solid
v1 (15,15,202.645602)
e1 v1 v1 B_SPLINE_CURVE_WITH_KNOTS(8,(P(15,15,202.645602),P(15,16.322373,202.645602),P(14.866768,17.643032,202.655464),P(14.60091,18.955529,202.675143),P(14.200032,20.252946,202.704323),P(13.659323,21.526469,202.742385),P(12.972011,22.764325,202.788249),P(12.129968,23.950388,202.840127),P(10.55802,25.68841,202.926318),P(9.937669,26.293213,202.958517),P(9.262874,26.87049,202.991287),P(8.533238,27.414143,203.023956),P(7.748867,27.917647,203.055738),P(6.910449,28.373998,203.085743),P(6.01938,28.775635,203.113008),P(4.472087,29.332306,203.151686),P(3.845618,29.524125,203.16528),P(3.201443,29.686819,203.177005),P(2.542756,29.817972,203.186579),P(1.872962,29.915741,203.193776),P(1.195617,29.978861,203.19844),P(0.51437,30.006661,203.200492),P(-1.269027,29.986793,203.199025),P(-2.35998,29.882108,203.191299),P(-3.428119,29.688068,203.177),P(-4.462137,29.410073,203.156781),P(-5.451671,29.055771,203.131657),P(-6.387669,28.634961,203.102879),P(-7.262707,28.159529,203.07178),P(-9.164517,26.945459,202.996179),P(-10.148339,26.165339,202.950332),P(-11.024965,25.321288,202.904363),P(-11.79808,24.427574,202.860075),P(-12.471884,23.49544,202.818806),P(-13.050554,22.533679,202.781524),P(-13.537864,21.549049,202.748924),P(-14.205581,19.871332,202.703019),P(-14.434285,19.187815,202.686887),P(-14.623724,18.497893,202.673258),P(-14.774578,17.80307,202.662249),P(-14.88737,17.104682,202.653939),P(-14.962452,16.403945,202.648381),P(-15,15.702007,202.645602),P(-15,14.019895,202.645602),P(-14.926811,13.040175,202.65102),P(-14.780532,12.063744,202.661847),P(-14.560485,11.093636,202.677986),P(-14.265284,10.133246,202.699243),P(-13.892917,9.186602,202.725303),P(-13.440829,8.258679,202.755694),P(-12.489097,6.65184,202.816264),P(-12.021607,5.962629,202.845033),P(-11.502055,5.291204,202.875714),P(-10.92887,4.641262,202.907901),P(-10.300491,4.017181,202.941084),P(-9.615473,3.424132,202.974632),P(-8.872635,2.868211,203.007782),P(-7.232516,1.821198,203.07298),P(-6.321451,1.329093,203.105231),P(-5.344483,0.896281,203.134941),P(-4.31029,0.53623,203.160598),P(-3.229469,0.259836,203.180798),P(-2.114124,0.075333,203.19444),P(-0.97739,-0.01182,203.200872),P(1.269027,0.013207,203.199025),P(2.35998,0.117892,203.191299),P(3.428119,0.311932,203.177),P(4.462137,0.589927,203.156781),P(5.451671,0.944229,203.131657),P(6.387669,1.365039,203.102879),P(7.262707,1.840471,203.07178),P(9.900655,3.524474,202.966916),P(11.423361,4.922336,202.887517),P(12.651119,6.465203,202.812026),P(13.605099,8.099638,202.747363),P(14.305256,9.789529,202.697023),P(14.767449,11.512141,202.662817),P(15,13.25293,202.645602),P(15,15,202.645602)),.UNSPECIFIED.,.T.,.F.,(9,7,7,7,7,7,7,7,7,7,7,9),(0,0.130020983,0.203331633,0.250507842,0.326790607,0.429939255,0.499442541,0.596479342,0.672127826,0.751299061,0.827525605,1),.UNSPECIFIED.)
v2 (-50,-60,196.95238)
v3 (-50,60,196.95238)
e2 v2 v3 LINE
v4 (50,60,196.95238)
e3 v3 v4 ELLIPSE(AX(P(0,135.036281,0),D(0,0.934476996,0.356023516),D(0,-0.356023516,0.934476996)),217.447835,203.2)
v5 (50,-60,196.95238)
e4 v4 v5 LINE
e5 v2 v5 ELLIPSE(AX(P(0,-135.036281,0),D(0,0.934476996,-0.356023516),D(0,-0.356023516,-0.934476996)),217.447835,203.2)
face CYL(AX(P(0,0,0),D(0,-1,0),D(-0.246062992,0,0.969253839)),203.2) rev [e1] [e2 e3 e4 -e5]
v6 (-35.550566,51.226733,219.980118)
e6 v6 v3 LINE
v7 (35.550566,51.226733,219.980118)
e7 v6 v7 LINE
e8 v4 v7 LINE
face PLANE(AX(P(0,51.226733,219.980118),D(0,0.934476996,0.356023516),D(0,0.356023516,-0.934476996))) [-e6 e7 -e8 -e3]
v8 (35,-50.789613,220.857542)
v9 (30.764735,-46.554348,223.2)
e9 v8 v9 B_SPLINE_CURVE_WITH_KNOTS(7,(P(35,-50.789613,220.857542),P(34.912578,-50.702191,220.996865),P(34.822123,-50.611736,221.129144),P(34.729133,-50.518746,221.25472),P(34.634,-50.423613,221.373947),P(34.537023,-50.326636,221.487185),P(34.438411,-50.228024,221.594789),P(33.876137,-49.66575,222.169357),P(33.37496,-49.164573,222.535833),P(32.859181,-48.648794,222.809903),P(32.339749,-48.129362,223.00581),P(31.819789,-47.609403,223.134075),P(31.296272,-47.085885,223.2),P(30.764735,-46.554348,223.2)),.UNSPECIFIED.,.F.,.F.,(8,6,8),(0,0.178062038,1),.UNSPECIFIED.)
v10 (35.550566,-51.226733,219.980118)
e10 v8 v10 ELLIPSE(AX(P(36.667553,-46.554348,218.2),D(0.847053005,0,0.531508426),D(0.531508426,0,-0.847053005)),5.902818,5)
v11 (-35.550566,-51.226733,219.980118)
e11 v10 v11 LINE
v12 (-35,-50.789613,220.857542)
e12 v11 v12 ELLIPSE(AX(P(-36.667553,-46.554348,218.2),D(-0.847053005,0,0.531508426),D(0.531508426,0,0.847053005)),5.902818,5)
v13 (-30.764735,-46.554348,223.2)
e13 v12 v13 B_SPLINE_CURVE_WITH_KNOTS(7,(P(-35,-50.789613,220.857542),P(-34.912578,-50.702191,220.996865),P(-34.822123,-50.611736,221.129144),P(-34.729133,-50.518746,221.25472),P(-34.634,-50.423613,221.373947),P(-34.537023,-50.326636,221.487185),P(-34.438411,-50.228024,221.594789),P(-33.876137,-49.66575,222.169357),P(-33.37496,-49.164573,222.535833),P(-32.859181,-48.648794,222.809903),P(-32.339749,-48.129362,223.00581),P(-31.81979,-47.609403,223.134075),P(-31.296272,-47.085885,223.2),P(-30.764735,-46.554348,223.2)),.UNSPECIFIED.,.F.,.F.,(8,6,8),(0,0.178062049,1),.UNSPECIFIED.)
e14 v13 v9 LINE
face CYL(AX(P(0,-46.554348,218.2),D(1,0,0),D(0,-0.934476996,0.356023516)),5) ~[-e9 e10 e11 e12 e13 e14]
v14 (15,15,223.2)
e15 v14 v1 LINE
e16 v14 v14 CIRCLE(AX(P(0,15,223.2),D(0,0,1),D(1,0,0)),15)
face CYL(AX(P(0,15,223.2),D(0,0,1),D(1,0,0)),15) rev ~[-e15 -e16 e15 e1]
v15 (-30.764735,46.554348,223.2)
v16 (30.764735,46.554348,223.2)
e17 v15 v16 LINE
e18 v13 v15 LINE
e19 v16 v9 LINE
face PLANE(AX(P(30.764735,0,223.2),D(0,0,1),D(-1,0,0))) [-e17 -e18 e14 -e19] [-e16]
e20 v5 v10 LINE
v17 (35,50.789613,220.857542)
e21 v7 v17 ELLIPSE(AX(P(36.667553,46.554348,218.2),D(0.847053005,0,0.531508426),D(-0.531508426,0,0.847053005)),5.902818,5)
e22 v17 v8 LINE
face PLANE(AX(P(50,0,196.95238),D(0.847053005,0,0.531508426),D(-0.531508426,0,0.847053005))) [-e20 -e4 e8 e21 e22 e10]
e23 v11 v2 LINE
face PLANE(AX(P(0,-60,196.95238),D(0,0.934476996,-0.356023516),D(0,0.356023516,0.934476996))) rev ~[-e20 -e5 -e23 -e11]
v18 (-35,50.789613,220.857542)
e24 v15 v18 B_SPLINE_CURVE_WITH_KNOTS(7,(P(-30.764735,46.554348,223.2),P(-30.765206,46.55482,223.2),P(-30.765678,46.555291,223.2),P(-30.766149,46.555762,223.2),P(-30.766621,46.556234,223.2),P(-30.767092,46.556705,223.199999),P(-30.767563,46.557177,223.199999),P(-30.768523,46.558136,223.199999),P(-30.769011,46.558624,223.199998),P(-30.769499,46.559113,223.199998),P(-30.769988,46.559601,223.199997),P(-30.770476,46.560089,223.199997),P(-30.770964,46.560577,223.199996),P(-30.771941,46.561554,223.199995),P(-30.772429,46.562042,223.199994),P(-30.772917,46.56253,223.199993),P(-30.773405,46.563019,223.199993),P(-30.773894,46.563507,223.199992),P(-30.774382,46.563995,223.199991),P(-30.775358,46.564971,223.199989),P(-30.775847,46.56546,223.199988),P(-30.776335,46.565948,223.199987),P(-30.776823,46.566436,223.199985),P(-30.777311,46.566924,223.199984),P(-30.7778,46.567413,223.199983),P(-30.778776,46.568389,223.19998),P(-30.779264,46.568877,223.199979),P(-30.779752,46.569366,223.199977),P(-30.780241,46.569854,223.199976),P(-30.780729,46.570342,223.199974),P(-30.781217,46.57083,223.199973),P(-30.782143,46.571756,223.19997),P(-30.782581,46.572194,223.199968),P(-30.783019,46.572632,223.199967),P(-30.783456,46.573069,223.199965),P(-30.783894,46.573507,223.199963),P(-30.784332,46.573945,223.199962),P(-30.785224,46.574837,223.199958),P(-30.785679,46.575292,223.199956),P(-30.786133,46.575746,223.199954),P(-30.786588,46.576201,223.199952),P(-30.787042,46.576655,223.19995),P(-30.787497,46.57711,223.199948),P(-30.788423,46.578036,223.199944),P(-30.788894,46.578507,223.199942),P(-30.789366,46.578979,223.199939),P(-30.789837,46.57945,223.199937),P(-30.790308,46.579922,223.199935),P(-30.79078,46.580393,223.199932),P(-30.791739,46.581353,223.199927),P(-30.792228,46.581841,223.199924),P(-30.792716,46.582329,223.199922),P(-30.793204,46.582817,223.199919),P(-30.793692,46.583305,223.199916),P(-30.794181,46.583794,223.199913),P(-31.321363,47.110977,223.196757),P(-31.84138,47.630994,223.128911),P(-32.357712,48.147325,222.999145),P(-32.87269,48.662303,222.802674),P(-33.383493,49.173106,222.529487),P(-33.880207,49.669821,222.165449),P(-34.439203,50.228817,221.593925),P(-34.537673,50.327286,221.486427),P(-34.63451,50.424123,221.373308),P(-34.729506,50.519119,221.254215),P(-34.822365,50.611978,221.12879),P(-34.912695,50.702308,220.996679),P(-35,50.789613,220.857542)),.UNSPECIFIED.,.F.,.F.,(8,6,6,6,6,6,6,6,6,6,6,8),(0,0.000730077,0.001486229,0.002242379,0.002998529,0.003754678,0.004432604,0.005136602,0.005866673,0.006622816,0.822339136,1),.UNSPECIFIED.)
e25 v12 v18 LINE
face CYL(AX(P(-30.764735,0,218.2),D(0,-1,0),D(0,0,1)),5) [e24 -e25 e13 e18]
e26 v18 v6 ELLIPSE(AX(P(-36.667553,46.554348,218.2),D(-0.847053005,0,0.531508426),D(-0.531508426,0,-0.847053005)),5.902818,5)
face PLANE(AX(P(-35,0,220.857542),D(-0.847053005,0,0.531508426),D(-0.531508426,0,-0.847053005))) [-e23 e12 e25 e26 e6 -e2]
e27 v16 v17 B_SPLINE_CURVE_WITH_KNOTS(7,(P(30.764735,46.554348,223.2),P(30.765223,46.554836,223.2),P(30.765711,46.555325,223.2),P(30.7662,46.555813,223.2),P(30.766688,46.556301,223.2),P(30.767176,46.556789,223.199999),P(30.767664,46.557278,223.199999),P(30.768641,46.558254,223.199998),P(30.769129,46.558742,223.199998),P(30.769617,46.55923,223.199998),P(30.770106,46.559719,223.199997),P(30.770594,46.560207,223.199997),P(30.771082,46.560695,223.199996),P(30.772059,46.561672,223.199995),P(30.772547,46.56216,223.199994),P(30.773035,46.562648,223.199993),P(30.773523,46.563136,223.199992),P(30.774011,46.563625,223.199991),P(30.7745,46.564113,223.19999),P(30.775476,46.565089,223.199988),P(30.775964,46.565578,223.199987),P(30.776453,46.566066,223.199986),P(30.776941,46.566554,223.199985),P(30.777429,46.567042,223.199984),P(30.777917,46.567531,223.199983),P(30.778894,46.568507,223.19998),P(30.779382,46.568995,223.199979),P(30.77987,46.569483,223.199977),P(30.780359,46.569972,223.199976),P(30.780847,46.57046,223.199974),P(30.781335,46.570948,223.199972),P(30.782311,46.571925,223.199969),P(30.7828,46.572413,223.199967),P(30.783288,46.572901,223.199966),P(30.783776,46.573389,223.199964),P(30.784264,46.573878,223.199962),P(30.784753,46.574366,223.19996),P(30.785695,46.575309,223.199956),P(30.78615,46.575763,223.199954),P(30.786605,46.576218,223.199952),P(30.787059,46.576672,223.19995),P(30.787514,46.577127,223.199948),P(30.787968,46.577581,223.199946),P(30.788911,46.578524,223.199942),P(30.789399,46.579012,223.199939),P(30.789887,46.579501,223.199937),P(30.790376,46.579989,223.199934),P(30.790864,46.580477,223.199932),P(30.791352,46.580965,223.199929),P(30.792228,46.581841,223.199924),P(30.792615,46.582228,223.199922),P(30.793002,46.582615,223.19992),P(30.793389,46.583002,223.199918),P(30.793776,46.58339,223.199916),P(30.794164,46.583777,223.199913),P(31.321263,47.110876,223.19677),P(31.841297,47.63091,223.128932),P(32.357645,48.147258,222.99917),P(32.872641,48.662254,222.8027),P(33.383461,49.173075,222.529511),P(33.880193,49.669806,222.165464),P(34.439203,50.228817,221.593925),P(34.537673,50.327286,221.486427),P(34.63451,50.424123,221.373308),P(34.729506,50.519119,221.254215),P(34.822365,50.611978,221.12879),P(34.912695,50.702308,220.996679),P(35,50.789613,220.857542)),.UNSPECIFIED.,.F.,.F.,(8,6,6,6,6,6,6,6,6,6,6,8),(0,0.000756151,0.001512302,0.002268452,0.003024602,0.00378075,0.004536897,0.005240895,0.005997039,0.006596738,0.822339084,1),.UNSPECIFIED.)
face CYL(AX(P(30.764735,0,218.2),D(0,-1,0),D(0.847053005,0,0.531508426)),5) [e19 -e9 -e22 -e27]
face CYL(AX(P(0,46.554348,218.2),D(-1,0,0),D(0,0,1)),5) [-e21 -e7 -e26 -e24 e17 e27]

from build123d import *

# Parameters (mm, degrees)
F1_DEPTH = 60
F3_DEPTH = 75
F4_R     = 15
F5_DEPTH = 25


# Not quite as in the source:
# - a feature names something its author has since deleted; it is built from what else it names


with BuildPart() as f1:
    # F0 (on Front) → F1 (new body, symmetric)
    with BuildSketch(Plane.XZ):
        with BuildLine():
            ThreePointArc((-50, 196.9523800313), (0, 203.2), (50, 196.9523800313))
            Line((50, 196.9523800313), (35, 220.857542129))
            ThreePointArc((35, 220.857542129), (33.1846822218, 222.5753691641), (30.7647349749, 223.2))
            Line((30.7647349749, 223.2), (-30.7647349749, 223.2))
            ThreePointArc((-30.7647349749, 223.2), (-33.1846822218, 222.5753691641), (-35, 220.857542129))
            Line((-35, 220.857542129), (-50, 196.9523800313))
        make_face()
    extrude(amount=F1_DEPTH, both=True)

    # F2 (on Right) → F3 (cut, symmetric)
    with BuildSketch(Plane.YZ):
        with BuildLine():
            Line((60, 223.2), (46.5543481195, 223.2))
            ThreePointArc((46.5543481195, 223.2), (49.3915485081, 222.3170734697), (51.2267330988, 219.980117582))
            Line((51.2267330988, 219.980117582), (60, 196.9523800313))
            Line((60, 196.9523800313), (60, 223.2))
        make_face()
        with BuildLine():
            ThreePointArc((-51.2267330988, 219.980117582), (-49.3915485081, 222.3170734697), (-46.5543481195, 223.2))
            Line((-46.5543481195, 223.2), (-60, 223.2))
            Line((-60, 223.2), (-60, 196.9523800313))
            Line((-60, 196.9523800313), (-51.2267330988, 219.980117582))
        make_face()
    extrude(amount=F3_DEPTH, both=True, mode=Mode.SUBTRACT)

    # F4 (on face) → F5 (cut)
    with BuildSketch(Plane.XY.offset(223.2)):
        with Locations((0, 15)):
            Circle(F4_R)
    extrude(amount=-F5_DEPTH, mode=Mode.SUBTRACT)


solid = f1.part
